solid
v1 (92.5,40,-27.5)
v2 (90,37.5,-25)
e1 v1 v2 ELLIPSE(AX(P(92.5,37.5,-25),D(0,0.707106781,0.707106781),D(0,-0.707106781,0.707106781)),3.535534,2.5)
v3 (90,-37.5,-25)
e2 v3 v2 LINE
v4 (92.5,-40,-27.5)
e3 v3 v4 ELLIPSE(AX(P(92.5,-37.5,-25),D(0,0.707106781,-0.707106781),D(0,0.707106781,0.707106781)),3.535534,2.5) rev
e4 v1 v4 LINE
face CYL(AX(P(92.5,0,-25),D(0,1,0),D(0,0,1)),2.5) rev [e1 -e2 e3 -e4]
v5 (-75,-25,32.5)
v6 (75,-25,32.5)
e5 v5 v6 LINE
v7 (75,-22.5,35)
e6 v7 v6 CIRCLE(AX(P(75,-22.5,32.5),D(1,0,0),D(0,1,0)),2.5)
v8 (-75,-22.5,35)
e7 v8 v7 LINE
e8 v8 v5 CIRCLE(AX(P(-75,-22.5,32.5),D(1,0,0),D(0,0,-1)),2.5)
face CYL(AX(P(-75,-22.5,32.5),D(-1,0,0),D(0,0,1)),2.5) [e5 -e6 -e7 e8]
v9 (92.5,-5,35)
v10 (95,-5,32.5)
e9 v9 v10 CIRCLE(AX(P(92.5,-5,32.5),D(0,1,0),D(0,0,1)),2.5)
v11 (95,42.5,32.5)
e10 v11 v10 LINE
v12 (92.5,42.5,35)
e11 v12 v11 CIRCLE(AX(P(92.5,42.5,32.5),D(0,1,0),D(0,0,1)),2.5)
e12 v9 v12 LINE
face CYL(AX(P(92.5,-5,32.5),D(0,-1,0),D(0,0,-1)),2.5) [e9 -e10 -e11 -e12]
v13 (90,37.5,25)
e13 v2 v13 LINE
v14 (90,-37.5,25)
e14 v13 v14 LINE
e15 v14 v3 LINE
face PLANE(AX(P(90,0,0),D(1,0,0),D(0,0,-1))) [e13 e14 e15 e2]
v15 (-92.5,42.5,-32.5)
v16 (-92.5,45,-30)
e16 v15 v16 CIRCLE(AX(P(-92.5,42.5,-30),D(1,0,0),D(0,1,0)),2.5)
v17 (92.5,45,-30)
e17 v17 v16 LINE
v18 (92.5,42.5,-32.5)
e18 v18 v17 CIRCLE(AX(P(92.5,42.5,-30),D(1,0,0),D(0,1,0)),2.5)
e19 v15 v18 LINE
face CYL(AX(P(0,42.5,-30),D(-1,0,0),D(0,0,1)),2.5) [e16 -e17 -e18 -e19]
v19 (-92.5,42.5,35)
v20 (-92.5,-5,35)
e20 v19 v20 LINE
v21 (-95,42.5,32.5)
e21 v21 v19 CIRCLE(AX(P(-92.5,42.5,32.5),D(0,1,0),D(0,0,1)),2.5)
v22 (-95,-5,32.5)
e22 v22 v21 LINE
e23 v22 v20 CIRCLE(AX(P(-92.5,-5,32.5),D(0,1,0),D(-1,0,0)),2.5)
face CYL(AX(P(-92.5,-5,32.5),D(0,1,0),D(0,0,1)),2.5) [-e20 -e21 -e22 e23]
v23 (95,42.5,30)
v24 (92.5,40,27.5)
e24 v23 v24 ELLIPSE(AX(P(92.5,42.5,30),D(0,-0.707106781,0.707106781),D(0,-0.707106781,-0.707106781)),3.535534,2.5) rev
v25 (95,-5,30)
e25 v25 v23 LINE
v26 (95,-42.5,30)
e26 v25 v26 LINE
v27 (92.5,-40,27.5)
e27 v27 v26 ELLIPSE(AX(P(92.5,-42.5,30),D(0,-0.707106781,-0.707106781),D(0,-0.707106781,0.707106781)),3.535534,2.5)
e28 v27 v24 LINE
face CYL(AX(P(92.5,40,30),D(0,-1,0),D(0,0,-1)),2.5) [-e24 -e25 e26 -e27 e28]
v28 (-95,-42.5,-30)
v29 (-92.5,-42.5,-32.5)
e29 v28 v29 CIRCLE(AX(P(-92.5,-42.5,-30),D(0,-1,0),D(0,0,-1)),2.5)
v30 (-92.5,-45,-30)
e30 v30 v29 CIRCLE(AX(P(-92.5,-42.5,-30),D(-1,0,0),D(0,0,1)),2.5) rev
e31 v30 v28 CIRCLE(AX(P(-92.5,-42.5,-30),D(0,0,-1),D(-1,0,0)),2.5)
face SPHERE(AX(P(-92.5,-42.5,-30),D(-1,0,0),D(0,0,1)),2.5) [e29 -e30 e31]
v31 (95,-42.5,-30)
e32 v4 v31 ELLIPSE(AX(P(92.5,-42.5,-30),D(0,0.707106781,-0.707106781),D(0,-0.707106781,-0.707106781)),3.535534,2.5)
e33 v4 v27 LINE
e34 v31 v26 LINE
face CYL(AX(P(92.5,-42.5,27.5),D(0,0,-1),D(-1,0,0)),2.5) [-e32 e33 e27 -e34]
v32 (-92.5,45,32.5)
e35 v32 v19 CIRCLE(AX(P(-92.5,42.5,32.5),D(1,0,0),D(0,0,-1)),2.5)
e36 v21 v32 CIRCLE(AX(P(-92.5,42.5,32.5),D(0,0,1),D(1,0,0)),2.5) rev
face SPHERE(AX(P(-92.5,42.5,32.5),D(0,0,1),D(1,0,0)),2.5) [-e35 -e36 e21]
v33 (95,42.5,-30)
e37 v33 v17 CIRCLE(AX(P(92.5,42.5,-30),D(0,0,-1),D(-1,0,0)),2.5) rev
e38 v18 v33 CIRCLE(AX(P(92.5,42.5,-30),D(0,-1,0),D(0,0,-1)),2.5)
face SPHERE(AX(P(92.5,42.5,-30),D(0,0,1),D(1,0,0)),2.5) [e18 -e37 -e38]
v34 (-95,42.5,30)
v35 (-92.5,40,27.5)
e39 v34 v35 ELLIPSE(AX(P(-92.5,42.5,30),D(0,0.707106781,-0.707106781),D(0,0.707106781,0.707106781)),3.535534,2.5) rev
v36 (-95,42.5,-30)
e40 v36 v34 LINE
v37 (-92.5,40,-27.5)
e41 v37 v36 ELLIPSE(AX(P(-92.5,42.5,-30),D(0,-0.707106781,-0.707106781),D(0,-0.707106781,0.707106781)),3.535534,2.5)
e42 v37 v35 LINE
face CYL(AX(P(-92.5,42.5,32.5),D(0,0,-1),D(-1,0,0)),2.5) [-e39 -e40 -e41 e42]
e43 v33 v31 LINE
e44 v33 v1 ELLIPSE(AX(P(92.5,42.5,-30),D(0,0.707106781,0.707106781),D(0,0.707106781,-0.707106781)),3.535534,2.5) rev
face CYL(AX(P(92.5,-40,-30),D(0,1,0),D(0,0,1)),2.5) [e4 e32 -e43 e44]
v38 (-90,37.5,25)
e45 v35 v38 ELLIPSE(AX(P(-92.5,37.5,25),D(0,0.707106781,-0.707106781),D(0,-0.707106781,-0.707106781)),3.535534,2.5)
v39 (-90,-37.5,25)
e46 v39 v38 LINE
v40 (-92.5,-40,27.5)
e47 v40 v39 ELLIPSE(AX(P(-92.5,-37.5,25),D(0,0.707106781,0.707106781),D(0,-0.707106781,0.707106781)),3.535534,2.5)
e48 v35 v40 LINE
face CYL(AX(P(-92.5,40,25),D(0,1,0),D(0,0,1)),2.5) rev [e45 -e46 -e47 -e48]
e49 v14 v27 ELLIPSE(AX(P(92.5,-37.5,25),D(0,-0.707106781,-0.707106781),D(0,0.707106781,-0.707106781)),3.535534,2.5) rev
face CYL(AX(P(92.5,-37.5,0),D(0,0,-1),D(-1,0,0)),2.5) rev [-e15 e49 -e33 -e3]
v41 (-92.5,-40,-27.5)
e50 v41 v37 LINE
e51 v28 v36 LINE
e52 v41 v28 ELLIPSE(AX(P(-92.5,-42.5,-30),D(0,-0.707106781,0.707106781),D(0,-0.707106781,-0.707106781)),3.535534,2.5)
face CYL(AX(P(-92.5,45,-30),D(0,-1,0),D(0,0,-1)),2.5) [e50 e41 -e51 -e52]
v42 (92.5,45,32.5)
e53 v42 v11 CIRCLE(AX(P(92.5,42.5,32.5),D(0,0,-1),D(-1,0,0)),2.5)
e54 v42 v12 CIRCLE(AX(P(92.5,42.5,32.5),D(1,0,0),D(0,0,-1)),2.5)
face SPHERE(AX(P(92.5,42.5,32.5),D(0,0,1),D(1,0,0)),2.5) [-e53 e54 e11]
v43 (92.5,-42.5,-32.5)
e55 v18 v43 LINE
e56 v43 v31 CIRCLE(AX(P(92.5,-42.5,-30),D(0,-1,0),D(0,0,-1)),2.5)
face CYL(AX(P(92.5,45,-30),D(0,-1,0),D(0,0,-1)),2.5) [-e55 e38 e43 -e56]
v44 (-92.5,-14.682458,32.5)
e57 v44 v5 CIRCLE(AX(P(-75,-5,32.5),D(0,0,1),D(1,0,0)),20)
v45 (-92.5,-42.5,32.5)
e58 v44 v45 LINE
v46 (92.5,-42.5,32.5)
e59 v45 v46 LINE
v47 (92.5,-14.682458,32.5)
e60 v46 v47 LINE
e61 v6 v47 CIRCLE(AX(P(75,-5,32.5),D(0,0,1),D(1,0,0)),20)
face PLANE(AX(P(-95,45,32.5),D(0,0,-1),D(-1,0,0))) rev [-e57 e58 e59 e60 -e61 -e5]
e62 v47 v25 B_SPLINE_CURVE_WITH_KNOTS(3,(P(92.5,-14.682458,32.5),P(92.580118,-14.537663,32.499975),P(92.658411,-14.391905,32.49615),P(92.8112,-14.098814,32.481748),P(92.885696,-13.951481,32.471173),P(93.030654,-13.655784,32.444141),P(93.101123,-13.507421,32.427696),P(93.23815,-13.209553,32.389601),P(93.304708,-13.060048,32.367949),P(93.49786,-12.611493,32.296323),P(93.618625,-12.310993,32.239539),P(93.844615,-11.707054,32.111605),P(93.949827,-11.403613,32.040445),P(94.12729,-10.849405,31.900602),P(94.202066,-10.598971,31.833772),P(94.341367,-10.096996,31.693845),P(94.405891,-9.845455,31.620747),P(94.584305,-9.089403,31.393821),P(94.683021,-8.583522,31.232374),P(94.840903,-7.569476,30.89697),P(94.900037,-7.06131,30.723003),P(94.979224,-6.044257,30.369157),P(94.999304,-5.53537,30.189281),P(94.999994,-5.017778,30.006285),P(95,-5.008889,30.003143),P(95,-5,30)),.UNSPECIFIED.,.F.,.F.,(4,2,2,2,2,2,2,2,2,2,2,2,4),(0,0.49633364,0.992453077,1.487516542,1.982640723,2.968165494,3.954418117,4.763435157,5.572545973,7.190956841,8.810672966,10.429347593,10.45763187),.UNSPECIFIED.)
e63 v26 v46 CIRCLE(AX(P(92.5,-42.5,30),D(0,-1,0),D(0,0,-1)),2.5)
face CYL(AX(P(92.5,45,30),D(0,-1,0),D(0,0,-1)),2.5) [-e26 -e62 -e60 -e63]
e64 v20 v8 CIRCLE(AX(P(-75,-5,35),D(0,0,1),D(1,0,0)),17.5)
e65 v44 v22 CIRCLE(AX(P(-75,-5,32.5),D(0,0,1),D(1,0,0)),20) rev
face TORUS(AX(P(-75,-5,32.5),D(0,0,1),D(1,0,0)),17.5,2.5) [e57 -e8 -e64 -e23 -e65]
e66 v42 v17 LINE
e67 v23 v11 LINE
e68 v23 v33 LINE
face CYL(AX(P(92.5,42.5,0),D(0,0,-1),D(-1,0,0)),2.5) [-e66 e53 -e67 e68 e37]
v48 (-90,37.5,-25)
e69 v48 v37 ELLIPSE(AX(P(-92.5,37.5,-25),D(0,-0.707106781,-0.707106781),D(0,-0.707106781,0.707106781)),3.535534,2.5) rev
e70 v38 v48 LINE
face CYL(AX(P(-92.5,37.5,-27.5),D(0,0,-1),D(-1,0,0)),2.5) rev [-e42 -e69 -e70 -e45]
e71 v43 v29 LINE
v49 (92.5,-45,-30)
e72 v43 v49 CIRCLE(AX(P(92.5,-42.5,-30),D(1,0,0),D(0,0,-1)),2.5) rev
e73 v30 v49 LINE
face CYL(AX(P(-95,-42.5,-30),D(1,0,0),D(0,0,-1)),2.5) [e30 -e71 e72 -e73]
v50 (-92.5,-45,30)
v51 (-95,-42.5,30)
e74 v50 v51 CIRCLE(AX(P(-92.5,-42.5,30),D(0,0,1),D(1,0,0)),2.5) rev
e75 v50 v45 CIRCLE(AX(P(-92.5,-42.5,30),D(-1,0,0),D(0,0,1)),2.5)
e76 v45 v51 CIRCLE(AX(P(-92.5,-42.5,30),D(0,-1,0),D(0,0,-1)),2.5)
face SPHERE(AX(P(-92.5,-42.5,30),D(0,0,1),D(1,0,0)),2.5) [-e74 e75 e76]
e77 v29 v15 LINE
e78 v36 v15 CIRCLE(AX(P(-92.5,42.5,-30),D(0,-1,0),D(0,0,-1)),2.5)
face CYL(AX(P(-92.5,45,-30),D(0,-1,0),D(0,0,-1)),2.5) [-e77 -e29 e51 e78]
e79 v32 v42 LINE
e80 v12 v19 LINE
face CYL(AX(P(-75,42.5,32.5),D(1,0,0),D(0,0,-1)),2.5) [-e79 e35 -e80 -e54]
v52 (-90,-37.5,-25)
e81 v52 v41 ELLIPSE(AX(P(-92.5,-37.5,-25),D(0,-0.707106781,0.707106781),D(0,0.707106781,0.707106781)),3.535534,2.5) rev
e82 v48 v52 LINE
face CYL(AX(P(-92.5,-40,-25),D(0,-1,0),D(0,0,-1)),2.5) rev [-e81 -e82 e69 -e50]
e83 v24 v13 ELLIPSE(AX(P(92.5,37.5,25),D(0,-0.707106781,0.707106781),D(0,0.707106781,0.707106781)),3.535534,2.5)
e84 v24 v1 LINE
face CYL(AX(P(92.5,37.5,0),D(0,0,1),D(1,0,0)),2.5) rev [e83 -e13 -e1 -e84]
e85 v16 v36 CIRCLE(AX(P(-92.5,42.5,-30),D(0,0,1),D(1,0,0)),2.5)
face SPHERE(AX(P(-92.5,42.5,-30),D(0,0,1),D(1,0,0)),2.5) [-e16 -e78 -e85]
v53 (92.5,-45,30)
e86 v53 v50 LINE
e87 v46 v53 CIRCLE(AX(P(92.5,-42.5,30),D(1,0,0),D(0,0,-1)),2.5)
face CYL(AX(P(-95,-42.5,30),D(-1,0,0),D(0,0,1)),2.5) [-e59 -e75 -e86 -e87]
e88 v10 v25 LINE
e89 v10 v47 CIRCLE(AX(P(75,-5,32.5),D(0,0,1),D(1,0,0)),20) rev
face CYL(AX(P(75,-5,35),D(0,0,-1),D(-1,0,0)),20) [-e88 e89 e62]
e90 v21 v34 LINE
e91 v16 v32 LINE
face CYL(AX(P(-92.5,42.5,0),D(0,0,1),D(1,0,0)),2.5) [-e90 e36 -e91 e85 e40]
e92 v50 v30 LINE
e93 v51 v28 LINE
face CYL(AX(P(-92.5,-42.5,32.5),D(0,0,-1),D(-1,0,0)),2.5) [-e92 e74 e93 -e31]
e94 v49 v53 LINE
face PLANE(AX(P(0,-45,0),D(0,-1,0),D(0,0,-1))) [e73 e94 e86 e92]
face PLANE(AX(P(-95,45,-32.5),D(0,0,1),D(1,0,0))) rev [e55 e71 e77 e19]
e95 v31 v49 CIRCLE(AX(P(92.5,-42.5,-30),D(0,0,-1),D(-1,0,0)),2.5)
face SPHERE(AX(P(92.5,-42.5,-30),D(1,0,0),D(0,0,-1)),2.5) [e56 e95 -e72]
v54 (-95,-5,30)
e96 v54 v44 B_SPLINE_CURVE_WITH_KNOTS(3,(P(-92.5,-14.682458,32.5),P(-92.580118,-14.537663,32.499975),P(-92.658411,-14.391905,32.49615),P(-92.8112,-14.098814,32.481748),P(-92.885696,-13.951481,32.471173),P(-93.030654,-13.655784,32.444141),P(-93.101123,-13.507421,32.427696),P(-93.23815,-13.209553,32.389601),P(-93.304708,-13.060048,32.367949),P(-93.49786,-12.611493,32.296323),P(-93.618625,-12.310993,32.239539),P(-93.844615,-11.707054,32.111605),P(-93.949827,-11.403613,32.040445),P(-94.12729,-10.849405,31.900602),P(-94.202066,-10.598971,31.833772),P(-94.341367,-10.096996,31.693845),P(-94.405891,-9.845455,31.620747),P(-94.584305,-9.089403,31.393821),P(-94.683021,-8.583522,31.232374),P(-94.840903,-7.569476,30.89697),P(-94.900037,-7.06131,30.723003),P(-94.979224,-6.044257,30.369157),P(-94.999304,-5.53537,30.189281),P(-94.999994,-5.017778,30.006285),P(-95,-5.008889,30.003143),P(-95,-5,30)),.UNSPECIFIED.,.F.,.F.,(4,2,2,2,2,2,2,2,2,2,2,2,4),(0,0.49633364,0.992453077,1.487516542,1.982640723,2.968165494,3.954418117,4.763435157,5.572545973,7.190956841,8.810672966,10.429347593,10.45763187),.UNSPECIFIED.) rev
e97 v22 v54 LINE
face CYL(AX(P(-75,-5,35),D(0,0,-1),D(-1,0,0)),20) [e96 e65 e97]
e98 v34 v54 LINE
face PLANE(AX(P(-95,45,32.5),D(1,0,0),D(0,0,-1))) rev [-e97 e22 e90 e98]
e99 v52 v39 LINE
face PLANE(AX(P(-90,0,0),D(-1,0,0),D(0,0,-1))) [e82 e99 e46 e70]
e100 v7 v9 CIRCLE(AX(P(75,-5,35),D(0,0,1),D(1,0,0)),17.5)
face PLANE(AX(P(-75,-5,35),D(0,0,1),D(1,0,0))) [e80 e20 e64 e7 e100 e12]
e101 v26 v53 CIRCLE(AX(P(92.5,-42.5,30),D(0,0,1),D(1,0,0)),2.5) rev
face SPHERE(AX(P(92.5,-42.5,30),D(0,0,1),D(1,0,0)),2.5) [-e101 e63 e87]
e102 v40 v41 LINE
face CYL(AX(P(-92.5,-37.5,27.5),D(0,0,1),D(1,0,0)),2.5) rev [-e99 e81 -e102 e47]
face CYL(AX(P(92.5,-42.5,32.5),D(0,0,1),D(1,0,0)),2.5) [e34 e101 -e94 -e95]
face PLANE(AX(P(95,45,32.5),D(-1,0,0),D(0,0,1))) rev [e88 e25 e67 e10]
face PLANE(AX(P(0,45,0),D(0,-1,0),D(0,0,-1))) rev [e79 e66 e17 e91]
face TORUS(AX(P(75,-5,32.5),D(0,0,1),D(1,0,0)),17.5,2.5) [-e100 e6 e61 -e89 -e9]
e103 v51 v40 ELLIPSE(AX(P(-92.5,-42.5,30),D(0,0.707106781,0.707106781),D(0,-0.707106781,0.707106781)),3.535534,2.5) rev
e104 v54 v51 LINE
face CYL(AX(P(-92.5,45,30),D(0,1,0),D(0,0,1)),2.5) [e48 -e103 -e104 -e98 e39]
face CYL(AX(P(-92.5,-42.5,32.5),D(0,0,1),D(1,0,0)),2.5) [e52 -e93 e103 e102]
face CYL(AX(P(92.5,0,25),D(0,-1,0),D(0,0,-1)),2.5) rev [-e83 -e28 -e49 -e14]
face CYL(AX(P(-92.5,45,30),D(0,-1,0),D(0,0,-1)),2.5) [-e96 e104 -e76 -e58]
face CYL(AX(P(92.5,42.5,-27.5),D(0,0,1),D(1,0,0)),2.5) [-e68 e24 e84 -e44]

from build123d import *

# Parameters (mm, degrees)
SKETCH_1_W          = 190
SKETCH_1_H          = 65
EXTRUDE_1_DEPTH     = 45
SKETCH_3_W          = 55
SKETCH_3_H          = 80
CUT_EXTRUDE_1_DEPTH = 5
EXTRUDE_2_DEPTH     = 2.5
FILLET_2_R          = 2.5
FILLET_3_R          = 2.5
FILLET_4_R          = 2.5


# Some blends are built 0.0001 mm under size
with BuildPart() as part:
    # ｽｹｯﾁ1 → ﾎﾞｽ - 押し出し1 (new, symmetric)
    with BuildSketch(Plane(origin=(0, 0, 0), x_dir=(1, 0, 0), z_dir=(0, 1, 0))):
        Rectangle(SKETCH_1_W, SKETCH_1_H)
    extrude(amount=EXTRUDE_1_DEPTH, both=True)

    # ｽｹｯﾁ3 → ｶｯﾄ - 押し出し1 (cut)
    with BuildSketch(Plane(origin=(95, 0, 0), x_dir=(0, 0, -1), z_dir=(1, 0, 0))):
        Rectangle(SKETCH_3_W, SKETCH_3_H)
    cut_extrude_1 = extrude(amount=-CUT_EXTRUDE_1_DEPTH, mode=Mode.SUBTRACT)

    # ﾐﾗｰ1: ｶｯﾄ - 押し出し1 across plane
    add(cut_extrude_1.mirror(Plane(origin=(0, 0, 0), x_dir=(0, 0, 1), z_dir=(1, 0, 0))), mode=Mode.SUBTRACT)

    # ｽｹｯﾁ4 → ﾎﾞｽ - 押し出し2 (add)
    with BuildSketch(Plane.XY.offset(32.5)):
        with BuildLine():
            Line((-95, 45), (95, 45))
            Line((95, 45), (95, -5))
            ThreePointArc((95, -5), (89.142135624, -19.142135624), (75, -25))
            Line((75, -25), (-75, -25))
            ThreePointArc((-75, -25), (-89.142135624, -19.142135624), (-95, -5))
            Line((-95, -5), (-95, 45))
        make_face()
    extrude(amount=EXTRUDE_2_DEPTH)

    # ﾌｨﾚｯﾄ2
    fillet_2_edges = [part.edges().sort_by_distance(p)[0] for p in [
        (0, -45, -32.5),
        (-95, -45, 0),
        (0, -45, 32.5),
        (95, -45, 0),
        (-90, -40, 0),
        (-90, 0, -27.5),
        (-90, 40, 0),
        (-90, 0, 27.5),
        (90, 40, 0),
        (90, 0, -27.5),
        (90, -40, 0),
        (90, 0, 27.5),
        (95, -25, 32.5),
        (95, 0, -32.5),
        (95, 45, 1.25),
        (95, 0, 27.5),
        (95, -40, 0),
        (95, 0, -27.5),
        (95, 40, 0),
        (-95, -25, 32.5),
        (-95, 0, -32.5),
        (-95, 45, 1.25),
        (-95, 0, -27.5),
        (-95, -40, 0),
        (-95, 0, 27.5),
        (-95, 40, 0),
    ]]
    fillet(fillet_2_edges, radius=FILLET_2_R - 0.0001)  # a hair under: the kernel refuses the full size

    # ﾌｨﾚｯﾄ3
    fillet_3_edges = [part.edges().sort_by_distance(p)[0] for p in [
        (94.267796242, 44.267796242, 35),
        (95, 18.75005, 35),
        (89.142135624, -19.142135624, 35),
        (0, -25, 35),
        (-89.142135624, -19.142135624, 35),
        (-95, 18.75005, 35),
        (-94.267796242, 44.267796242, 35),
        (0, 45, 35),
    ]]
    fillet(fillet_3_edges, radius=FILLET_3_R - 0.0001)  # a hair under: the kernel refuses the full size

    # ﾌｨﾚｯﾄ4
    # the kernel refuses this fillet: 2.5 mm, written as the material it takes off along each edge
    with BuildSketch(Plane(origin=(95, 42.5, -30), x_dir=(0, 0, -1), z_dir=(0, -1, 0))) as fillet_4_piece_1:
        with BuildLine():
            CenterArc((0.0001, -2.4999), 2.4999, 0, 90)
            Line((2.5, -2.4999), (2.5, 0))
            Line((2.5, 0), (0.0001, 0))
        make_face()
    revolve(axis=Axis((95, 42.5, -30), (1, 0, 0)), revolution_arc=90, mode=Mode.SUBTRACT)
    with BuildSketch(Plane(origin=(-95, 42.5, -30), x_dir=(0, 1, 0), z_dir=(0, 0, 1))) as fillet_4_piece_2:
        with BuildLine():
            CenterArc((0.0001, -2.4999), 2.4999, 0, 90)
            Line((2.5, -2.4999), (2.5, 0))
            Line((2.5, 0), (0.0001, 0))
        make_face()
    revolve(axis=Axis((-95, 42.5, -30), (-1, 0, 0)), revolution_arc=90, mode=Mode.SUBTRACT)
    with BuildSketch(Plane(origin=(95, 45, -32.5), x_dir=(0, 0, 1), z_dir=(-1, 0, 0))) as fillet_4_piece_3:
        with BuildLine():
            CenterArc((FILLET_4_R, -FILLET_4_R), FILLET_4_R, 90, 90)
            Line((0, -FILLET_4_R), (0, 0))
            Line((0, 0), (FILLET_4_R, 0))
        make_face()
    extrude(amount=190, mode=Mode.SUBTRACT)


solid = part.part
